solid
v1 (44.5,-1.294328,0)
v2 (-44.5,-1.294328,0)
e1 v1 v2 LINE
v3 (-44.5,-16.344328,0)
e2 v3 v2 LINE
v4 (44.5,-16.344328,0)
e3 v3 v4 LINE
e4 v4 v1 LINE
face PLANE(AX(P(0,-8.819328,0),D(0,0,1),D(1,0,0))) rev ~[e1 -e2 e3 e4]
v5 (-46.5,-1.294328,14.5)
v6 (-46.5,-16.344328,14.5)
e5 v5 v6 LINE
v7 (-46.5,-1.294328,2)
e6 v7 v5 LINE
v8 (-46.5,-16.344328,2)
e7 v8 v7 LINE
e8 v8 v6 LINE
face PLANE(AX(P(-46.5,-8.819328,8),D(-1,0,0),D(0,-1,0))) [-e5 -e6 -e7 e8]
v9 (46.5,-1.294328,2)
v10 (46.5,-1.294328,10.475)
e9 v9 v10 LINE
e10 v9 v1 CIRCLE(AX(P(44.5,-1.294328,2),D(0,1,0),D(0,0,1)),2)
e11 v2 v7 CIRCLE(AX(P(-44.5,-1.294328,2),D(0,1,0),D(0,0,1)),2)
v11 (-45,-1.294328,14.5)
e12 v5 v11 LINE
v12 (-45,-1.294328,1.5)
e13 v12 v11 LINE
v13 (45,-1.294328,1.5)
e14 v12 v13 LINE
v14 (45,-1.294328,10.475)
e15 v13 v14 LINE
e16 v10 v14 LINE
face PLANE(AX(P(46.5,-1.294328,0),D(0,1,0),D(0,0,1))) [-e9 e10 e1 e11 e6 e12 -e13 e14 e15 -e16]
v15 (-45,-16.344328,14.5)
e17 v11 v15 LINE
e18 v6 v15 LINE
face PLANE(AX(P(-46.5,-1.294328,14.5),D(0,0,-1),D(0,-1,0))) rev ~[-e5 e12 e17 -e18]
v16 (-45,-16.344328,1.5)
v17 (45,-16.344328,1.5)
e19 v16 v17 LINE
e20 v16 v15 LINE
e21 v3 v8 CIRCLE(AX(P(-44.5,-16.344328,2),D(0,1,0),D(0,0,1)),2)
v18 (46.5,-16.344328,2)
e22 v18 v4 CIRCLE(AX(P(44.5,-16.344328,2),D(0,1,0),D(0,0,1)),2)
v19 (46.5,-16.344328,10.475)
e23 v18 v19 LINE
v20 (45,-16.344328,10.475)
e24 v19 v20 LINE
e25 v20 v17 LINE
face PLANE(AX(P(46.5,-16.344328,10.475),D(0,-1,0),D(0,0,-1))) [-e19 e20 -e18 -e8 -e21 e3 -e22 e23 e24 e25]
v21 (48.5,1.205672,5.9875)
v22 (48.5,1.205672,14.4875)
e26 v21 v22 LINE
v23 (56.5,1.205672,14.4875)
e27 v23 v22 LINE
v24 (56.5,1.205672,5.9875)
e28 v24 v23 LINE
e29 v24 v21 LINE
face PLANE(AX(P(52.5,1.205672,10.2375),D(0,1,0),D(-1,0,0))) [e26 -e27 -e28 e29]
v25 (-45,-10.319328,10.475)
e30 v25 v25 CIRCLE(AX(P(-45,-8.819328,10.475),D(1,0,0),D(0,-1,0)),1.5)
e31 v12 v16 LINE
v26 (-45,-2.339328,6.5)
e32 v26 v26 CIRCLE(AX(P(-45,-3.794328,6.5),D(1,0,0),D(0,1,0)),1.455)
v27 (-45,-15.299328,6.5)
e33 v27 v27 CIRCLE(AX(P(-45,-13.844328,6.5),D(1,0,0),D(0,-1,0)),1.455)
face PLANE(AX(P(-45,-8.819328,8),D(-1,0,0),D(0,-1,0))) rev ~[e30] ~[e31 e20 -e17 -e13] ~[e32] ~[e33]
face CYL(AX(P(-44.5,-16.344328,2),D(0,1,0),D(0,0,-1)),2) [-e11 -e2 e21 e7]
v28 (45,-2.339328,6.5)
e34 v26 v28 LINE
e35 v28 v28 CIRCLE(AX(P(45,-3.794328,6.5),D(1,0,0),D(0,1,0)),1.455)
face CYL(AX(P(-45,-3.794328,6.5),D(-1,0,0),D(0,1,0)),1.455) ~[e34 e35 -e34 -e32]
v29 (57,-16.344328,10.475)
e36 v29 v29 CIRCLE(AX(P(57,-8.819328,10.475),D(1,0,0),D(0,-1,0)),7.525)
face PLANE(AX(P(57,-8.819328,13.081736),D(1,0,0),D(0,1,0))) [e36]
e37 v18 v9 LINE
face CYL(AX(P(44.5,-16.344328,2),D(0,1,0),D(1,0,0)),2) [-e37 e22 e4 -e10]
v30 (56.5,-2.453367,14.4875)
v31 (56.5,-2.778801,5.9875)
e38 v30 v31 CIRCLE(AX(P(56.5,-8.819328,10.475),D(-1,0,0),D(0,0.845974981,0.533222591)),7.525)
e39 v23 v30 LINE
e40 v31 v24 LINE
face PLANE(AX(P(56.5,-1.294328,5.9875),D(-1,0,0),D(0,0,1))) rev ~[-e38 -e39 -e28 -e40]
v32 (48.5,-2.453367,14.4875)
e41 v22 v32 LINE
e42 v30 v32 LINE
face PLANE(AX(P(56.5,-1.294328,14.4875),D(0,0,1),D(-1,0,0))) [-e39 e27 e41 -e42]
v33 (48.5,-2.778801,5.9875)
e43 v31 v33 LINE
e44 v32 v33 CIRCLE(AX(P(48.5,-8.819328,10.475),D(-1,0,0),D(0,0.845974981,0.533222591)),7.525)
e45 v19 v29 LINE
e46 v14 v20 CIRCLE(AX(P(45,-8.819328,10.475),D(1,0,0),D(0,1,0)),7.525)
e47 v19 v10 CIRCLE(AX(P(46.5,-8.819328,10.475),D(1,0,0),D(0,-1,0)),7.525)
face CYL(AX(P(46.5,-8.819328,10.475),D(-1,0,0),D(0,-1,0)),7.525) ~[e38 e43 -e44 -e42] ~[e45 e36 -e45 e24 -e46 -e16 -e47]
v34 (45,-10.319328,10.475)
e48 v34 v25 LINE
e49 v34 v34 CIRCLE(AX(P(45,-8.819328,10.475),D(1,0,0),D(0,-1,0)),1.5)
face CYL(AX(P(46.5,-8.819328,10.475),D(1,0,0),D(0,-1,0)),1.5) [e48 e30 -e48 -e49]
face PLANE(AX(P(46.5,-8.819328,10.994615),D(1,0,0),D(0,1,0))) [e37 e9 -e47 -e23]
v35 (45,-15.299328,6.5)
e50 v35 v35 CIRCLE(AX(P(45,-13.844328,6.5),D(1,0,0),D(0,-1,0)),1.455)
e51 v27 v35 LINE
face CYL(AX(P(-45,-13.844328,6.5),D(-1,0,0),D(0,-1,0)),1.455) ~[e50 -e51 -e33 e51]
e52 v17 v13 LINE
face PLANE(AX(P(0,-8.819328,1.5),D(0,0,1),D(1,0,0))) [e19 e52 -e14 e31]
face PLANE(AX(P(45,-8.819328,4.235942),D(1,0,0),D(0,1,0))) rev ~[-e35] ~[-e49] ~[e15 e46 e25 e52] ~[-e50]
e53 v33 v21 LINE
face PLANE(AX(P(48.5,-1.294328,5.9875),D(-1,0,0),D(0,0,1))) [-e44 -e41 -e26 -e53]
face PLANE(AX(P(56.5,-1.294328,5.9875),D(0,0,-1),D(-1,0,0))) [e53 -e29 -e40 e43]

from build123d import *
from build123d import SkipClean  # not in build123d's __all__

# Parameters (mm, degrees)
F0_W           = 93
F0_H           = 15.05
F1_DEPTH       = 1.5
F2_W           = 15.05
F2_H           = 13
F3_DEPTH       = 1.5
F4_R           = 2
F6_DEPTH       = 1.5
F7_R           = 2
F9_DEPTH       = 93
F11_DEPTH      = 10.5
F13_DEPTH      = 90
F15_W          = 8
F15_H          = 8.5
F16_DEPTH      = 2.5
F16_DEPTH_BACK = 2.5


# Not quite as in the source:
# - after a boolean that leaves OpenCascade's solid faulty, fix() repairs it
# - a feature names something its author has since deleted; it is built from what else it names


with BuildPart() as f1:
    # F0 (on Top) → F1 (new body)
    with BuildSketch(Plane.XY):
        with Locations((0, -8.8193283182)):
            Rectangle(F0_W, F0_H)
    extrude(amount=F1_DEPTH)

    # F2 (on face) → F3 (join)
    with BuildSketch(Plane(origin=(-46.5, 0, 0), x_dir=(0, -1, 0), z_dir=(-1, 0, 0))):
        with Locations((8.8193283182, 8)):
            Rectangle(F2_W, F2_H)
    extrude(amount=-F3_DEPTH)

    # F4
    f4_edges = [f1.edges().sort_by_distance(p)[0] for p in [
        (-46.5, -8.819328, 0),
    ]]
    fillet(f4_edges, radius=F4_R)

    # F5 (on face) → F6 (join)
    with BuildSketch(Plane.YZ.offset(46.5)):
        with BuildLine():
            Line((-16.3443283182, 10.475), (-16.3443283182, 0))
            Line((-16.3443283182, 0), (-1.2943283182, 0))
            Line((-1.2943283182, 0), (-1.2943283182, 10.475))
            ThreePointArc((-1.2943283182, 10.475), (-8.8193283182, 2.95), (-16.3443283182, 10.475))
        make_face()
        with BuildLine():
            ThreePointArc((-1.2943283182, 10.475), (-8.8193283182, 18), (-16.3443283182, 10.475))
            Line((-16.3443283182, 10.475), (-1.2943283182, 10.475))
        make_face()
        with BuildLine():
            Line((-1.2943283182, 10.475), (-16.3443283182, 10.475))
            ThreePointArc((-16.3443283182, 10.475), (-8.8193283182, 2.95), (-1.2943283182, 10.475))
        make_face()
    extrude(amount=-F6_DEPTH)

    # F7
    f7_edges = [f1.edges().sort_by_distance(p)[0] for p in [
        (46.5, -8.819328, 0),
    ]]
    fillet(f7_edges, radius=F7_R)

    # F8 (on face) → F9 (join)
    with BuildSketch(Plane.YZ.offset(46.5)):
        with BuildLine():
            ThreePointArc((-7.3193283182, 10.475), (-8.8193283182, 11.975), (-10.3193283182, 10.475))
            Line((-10.3193283182, 10.475), (-7.3193283182, 10.475))
        make_face()
        with BuildLine():
            Line((-7.3193283182, 10.475), (-10.3193283182, 10.475))
            ThreePointArc((-10.3193283182, 10.475), (-8.8193283182, 8.975), (-7.3193283182, 10.475))
        make_face()
    extrude(amount=-F9_DEPTH)

    # F10 (on face) → F11 (join)
    with BuildSketch(Plane.YZ.offset(46.5)):
        with BuildLine():
            ThreePointArc((-1.2943283182, 10.475), (-8.8193283182, 18), (-16.3443283182, 10.475))
            Line((-16.3443283182, 10.475), (-1.2943283182, 10.475))
        make_face()
        with BuildLine():
            Line((-1.2943283182, 10.475), (-16.3443283182, 10.475))
            ThreePointArc((-16.3443283182, 10.475), (-8.8193283182, 2.95), (-1.2943283182, 10.475))
        make_face()
    with SkipClean():  # cleaning this boolean's faces spoils the solid; the shape is the same uncleaned
        extrude(amount=F11_DEPTH)

    # F12 (on face) → F13 (join, through all)
    with BuildSketch(Plane.YZ.offset(-45)):
        with BuildLine():
            ThreePointArc((-12.3893283182, 6.5), (-13.8443283182, 7.955), (-15.2993283182, 6.5))
            Line((-15.2993283182, 6.5), (-13.8443283182, 6.5))
            Line((-13.8443283182, 6.5), (-12.3893283182, 6.5))
        make_face()
        with BuildLine():
            Line((-13.8443283182, 6.5), (-15.2993283182, 6.5))
            ThreePointArc((-15.2993283182, 6.5), (-13.8443283182, 5.045), (-12.3893283182, 6.5))
            Line((-12.3893283182, 6.5), (-13.8443283182, 6.5))
        make_face()
        with BuildLine():
            ThreePointArc((-5.2493283182, 6.5), (-3.7943283182, 5.045), (-2.3393283182, 6.5))
            Line((-2.3393283182, 6.5), (-3.7943283182, 6.5))
            Line((-3.7943283182, 6.5), (-5.2493283182, 6.5))
        make_face()
        with BuildLine():
            Line((-3.7943283182, 6.5), (-2.3393283182, 6.5))
            ThreePointArc((-2.3393283182, 6.5), (-3.7943283182, 7.955), (-5.2493283182, 6.5))
            Line((-5.2493283182, 6.5), (-3.7943283182, 6.5))
        make_face()
    extrude(amount=F13_DEPTH)

    add(f1.part.fix(), mode=Mode.REPLACE)

    # F15 (on offset) → F16 (join, two sides)
    with BuildSketch(Plane(origin=(0, -1.2943283182, 0), x_dir=(-1, 0, 0), z_dir=(0, 1, 0))) as f16_sk:
        with Locations((-52.5, 10.2375)):
            Rectangle(F15_W, F15_H)
    extrude(amount=F16_DEPTH)
    extrude(f16_sk.sketch, amount=-F16_DEPTH_BACK)


solid = f1.part
